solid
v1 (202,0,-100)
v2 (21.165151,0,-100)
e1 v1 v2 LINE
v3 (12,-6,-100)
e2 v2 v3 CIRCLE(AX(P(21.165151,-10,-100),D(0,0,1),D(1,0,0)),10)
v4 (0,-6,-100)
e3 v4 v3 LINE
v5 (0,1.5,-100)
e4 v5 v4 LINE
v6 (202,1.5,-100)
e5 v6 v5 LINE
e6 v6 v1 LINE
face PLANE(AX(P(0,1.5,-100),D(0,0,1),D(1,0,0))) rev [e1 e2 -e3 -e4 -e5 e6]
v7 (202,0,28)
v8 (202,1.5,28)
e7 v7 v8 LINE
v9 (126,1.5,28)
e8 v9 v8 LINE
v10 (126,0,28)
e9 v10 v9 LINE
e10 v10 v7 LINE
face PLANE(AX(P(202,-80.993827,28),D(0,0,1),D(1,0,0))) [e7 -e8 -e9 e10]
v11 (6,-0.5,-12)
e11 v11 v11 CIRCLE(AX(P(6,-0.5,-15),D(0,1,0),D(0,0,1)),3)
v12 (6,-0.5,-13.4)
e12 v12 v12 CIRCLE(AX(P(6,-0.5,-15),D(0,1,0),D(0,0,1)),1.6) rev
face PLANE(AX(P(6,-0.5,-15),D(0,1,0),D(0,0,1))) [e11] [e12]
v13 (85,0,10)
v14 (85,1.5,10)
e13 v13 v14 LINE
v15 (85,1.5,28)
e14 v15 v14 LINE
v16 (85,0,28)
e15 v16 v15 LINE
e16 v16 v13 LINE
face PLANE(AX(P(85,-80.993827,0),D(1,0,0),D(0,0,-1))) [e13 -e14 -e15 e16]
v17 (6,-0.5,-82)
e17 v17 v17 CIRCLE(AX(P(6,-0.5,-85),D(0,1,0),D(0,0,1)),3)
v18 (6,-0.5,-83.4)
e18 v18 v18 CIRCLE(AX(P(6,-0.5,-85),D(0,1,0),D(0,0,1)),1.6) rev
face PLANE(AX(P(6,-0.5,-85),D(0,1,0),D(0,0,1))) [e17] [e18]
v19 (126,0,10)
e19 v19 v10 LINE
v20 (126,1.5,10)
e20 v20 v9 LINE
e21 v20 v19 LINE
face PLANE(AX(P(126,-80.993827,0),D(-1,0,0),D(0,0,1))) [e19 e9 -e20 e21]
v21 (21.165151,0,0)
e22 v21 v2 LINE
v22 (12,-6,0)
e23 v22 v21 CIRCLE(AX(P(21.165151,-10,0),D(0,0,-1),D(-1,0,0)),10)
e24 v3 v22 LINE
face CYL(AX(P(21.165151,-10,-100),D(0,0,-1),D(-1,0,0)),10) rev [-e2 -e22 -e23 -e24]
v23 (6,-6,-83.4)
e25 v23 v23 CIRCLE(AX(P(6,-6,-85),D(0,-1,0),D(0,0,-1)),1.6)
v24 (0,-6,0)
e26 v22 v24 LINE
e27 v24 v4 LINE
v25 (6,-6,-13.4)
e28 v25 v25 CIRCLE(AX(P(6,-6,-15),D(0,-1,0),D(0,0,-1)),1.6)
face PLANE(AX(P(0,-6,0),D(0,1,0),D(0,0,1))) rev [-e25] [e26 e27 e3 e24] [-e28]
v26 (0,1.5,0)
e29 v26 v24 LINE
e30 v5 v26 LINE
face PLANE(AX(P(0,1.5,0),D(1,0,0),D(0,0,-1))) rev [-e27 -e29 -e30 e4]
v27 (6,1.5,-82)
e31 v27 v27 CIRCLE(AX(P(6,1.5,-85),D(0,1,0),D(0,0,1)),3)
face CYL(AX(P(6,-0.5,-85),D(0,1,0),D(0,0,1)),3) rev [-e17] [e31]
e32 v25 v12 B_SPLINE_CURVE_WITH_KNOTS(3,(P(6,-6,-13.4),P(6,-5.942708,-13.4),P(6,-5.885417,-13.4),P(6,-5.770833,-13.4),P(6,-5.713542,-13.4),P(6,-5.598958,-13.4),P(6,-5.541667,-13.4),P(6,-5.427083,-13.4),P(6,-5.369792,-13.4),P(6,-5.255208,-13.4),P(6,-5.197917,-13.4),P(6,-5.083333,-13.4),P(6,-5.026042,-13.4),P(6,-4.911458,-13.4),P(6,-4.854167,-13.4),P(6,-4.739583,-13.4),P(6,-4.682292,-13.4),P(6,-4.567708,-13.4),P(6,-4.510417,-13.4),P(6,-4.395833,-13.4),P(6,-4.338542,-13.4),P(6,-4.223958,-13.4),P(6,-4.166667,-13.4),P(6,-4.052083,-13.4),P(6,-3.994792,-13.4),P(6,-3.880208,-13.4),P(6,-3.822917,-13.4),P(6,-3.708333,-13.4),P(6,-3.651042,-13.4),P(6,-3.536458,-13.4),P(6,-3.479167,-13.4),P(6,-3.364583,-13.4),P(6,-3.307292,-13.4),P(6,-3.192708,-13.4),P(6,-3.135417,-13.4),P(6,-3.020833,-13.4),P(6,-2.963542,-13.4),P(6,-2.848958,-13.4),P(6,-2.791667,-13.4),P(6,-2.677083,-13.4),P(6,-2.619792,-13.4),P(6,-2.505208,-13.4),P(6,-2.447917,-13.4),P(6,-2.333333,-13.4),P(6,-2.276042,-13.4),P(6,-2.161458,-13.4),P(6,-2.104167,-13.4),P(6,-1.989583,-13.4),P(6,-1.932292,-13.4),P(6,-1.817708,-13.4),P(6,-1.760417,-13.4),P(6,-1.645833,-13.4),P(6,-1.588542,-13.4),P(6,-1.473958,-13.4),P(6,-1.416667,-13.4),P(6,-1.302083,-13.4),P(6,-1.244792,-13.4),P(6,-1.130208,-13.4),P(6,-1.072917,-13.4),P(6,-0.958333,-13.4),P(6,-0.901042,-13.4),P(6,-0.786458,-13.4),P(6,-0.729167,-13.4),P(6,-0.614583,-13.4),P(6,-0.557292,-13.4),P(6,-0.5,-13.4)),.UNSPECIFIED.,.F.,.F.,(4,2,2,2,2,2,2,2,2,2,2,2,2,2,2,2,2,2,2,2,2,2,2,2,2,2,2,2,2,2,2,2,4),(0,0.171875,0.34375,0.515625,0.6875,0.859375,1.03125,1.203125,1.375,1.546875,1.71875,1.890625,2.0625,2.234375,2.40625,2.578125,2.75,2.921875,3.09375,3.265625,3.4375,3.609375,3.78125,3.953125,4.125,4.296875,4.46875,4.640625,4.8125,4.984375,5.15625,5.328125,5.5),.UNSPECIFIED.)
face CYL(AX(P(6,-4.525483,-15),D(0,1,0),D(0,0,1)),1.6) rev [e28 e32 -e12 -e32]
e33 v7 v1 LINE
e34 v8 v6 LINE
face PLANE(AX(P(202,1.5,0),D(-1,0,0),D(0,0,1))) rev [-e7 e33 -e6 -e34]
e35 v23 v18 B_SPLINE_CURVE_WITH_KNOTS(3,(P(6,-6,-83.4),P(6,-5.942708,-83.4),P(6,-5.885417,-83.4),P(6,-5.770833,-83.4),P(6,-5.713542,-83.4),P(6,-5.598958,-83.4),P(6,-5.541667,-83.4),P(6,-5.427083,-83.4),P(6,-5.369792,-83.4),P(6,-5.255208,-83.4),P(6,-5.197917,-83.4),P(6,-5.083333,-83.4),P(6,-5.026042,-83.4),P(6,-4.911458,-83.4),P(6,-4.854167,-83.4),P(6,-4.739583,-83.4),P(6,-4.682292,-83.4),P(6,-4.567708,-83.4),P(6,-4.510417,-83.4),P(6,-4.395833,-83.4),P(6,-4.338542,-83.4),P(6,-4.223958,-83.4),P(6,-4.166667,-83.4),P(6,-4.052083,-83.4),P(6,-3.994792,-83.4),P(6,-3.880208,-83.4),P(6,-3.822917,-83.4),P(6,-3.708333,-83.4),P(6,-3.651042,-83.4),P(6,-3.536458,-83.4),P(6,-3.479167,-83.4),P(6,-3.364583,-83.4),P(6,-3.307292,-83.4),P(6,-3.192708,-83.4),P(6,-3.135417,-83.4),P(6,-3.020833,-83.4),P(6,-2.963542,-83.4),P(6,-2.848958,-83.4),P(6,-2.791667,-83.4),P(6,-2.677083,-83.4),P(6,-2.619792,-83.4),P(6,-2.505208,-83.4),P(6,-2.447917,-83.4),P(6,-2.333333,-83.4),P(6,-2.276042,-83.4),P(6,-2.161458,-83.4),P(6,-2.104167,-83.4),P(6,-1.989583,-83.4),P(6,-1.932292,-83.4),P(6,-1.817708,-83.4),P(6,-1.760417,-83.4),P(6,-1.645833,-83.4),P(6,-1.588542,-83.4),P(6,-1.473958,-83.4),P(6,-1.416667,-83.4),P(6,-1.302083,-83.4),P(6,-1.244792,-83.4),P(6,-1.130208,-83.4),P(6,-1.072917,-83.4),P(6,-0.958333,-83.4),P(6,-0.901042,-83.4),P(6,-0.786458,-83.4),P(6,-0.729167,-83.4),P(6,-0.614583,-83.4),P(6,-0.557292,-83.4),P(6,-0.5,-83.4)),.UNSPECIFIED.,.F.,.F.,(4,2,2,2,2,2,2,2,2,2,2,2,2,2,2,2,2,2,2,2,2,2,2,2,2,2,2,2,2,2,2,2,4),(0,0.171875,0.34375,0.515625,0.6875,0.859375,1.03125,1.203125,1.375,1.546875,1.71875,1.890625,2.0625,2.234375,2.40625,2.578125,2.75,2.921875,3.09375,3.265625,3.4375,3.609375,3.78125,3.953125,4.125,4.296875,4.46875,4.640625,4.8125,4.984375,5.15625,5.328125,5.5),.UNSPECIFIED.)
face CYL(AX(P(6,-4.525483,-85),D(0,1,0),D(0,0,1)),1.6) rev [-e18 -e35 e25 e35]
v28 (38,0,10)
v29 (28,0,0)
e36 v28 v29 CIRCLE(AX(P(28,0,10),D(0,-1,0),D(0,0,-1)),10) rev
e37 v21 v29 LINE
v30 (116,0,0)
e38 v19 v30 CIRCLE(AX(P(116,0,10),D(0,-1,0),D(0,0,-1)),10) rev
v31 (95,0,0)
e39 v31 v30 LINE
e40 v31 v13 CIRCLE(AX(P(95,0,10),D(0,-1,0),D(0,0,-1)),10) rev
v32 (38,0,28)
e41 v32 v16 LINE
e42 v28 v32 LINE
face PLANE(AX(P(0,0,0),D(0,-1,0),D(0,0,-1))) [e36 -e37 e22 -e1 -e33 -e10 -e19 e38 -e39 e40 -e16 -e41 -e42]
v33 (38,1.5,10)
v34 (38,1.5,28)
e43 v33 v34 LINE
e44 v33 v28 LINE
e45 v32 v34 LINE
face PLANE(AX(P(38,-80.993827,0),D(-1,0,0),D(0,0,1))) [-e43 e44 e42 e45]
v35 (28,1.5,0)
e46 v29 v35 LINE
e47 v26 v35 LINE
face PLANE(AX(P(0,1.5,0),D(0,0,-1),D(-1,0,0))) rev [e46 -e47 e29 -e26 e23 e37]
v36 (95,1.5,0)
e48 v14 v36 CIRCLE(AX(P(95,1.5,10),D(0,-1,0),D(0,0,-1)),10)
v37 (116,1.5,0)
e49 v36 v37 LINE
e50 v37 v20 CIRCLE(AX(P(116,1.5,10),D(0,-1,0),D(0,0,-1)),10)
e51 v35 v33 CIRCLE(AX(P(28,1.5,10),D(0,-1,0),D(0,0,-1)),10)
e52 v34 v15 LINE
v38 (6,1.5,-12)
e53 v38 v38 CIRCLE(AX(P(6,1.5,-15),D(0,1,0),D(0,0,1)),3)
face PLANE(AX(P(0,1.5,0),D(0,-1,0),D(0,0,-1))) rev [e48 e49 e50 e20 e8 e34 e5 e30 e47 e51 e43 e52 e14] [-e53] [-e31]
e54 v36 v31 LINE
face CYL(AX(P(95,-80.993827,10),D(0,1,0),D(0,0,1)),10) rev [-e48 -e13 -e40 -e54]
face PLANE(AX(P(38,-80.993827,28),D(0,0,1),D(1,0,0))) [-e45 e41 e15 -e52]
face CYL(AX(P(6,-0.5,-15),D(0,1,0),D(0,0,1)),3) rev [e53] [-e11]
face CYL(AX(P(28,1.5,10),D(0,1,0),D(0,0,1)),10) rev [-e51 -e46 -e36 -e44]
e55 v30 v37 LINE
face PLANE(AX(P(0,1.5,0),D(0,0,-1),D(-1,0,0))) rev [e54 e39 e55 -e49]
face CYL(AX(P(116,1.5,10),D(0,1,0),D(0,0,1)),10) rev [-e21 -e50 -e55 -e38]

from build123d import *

# Parameters (mm, degrees)
CROQUIS1_W              = 202
CROQUIS1_H              = 100
SALIENTE_EXTRUIR1_DEPTH = 1.5
CROQUIS2_R              = 1.6
CORTAR_EXTRUIR1_DEPTH   = 1.5
CROQUIS3_W              = 12
CROQUIS3_H              = 100
CROQUIS3_R              = 1.6
SALIENTE_EXTRUIR2_DEPTH = 6
CROQUIS4_W              = 47
CROQUIS4_H              = 28
CROQUIS4_W_2            = 76
SALIENTE_EXTRUIR3_DEPTH = 1.5
REDONDEO1_R             = 10
REDONDEO2_R             = 10
CROQUIS5_R              = 3
CORTAR_EXTRUIR2_DEPTH   = 2


with BuildPart() as part:
    # Croquis1 → Saliente-Extruir1 (new body)
    with BuildSketch(Plane(origin=(0, 0, 0), x_dir=(1, 0, 0), z_dir=(0, 1, 0))):
        with Locations((101, 50)):
            Rectangle(CROQUIS1_W, CROQUIS1_H)
    extrude(amount=SALIENTE_EXTRUIR1_DEPTH)

    # Croquis2 → Cortar-Extruir1 (cut)
    with BuildSketch(Plane(origin=(0, 1.5, 0), x_dir=(1, 0, 0), z_dir=(0, 1, 0))):
        with Locations(Location((6, 85, 0), (0, 0, 270))):
            Circle(CROQUIS2_R)
        with Locations(Location((6, 15, 0), (0, 0, 270))):
            Circle(CROQUIS2_R)
    extrude(amount=-CORTAR_EXTRUIR1_DEPTH, mode=Mode.SUBTRACT)

    # Croquis3 → Saliente-Extruir2 (add)
    with BuildSketch(Plane.XZ):
        with Locations((6, -50)):
            Rectangle(CROQUIS3_W, CROQUIS3_H)
        with Locations(Location((6, -15, 0), (0, 0, 90))):
            Circle(CROQUIS3_R, mode=Mode.SUBTRACT)
        with Locations(Location((6, -85, 0), (0, 0, 90))):
            Circle(CROQUIS3_R, mode=Mode.SUBTRACT)
    extrude(amount=SALIENTE_EXTRUIR2_DEPTH)

    # Croquis4 → Saliente-Extruir3 (add)
    with BuildSketch(Plane(origin=(0, 1.5, 0), x_dir=(1, 0, 0), z_dir=(0, 1, 0))):
        with Locations((61.5, -14)):
            Rectangle(CROQUIS4_W, CROQUIS4_H)
        with Locations((164, -14)):
            Rectangle(CROQUIS4_W_2, CROQUIS4_H)
    extrude(amount=-SALIENTE_EXTRUIR3_DEPTH)

    # Redondeo1
    redondeo1_edges = [part.edges().sort_by_distance(p)[0] for p in [
        (85, 0.75, 0),
        (38, 0.75, 0),
        (126, 0.75, 0),
    ]]
    fillet(redondeo1_edges, radius=REDONDEO1_R)

    # Redondeo2
    # the kernel refuses this fillet: 10 mm, written as the material it adds along each edge
    with BuildSketch(Plane(origin=(12, 0, -100), x_dir=(0, -1, 0), z_dir=(0, 0, 1))) as redondeo2_piece_1:
        with BuildLine():
            CenterArc((10, 9.16515139), REDONDEO2_R, 180, 66.421821522)
            Line((0, 9.16515139), (-0.2, 9.16515139))
            Line((-0.2, 9.16515139), (-0.2, 0))
            Line((-0.2, 0), (0, -0.2))
            ThreePointArc((0, -0.2), (3, -0.2), (5.92, -0.183303028))
            Line((5.92, -0.183303028), (6, 0))
        make_face()
    extrude(amount=100)

    # Croquis5 → Cortar-Extruir2 (cut)
    with BuildSketch(Plane(origin=(0, 1.5, 0), x_dir=(1, 0, 0), z_dir=(0, 1, 0))):
        with Locations(Location((6, 85, 0), (0, 0, 270))):
            Circle(CROQUIS5_R)
        with Locations(Location((6, 15, 0), (0, 0, 270))):
            Circle(CROQUIS5_R)
    extrude(amount=-CORTAR_EXTRUIR2_DEPTH, mode=Mode.SUBTRACT)


solid = part.part
